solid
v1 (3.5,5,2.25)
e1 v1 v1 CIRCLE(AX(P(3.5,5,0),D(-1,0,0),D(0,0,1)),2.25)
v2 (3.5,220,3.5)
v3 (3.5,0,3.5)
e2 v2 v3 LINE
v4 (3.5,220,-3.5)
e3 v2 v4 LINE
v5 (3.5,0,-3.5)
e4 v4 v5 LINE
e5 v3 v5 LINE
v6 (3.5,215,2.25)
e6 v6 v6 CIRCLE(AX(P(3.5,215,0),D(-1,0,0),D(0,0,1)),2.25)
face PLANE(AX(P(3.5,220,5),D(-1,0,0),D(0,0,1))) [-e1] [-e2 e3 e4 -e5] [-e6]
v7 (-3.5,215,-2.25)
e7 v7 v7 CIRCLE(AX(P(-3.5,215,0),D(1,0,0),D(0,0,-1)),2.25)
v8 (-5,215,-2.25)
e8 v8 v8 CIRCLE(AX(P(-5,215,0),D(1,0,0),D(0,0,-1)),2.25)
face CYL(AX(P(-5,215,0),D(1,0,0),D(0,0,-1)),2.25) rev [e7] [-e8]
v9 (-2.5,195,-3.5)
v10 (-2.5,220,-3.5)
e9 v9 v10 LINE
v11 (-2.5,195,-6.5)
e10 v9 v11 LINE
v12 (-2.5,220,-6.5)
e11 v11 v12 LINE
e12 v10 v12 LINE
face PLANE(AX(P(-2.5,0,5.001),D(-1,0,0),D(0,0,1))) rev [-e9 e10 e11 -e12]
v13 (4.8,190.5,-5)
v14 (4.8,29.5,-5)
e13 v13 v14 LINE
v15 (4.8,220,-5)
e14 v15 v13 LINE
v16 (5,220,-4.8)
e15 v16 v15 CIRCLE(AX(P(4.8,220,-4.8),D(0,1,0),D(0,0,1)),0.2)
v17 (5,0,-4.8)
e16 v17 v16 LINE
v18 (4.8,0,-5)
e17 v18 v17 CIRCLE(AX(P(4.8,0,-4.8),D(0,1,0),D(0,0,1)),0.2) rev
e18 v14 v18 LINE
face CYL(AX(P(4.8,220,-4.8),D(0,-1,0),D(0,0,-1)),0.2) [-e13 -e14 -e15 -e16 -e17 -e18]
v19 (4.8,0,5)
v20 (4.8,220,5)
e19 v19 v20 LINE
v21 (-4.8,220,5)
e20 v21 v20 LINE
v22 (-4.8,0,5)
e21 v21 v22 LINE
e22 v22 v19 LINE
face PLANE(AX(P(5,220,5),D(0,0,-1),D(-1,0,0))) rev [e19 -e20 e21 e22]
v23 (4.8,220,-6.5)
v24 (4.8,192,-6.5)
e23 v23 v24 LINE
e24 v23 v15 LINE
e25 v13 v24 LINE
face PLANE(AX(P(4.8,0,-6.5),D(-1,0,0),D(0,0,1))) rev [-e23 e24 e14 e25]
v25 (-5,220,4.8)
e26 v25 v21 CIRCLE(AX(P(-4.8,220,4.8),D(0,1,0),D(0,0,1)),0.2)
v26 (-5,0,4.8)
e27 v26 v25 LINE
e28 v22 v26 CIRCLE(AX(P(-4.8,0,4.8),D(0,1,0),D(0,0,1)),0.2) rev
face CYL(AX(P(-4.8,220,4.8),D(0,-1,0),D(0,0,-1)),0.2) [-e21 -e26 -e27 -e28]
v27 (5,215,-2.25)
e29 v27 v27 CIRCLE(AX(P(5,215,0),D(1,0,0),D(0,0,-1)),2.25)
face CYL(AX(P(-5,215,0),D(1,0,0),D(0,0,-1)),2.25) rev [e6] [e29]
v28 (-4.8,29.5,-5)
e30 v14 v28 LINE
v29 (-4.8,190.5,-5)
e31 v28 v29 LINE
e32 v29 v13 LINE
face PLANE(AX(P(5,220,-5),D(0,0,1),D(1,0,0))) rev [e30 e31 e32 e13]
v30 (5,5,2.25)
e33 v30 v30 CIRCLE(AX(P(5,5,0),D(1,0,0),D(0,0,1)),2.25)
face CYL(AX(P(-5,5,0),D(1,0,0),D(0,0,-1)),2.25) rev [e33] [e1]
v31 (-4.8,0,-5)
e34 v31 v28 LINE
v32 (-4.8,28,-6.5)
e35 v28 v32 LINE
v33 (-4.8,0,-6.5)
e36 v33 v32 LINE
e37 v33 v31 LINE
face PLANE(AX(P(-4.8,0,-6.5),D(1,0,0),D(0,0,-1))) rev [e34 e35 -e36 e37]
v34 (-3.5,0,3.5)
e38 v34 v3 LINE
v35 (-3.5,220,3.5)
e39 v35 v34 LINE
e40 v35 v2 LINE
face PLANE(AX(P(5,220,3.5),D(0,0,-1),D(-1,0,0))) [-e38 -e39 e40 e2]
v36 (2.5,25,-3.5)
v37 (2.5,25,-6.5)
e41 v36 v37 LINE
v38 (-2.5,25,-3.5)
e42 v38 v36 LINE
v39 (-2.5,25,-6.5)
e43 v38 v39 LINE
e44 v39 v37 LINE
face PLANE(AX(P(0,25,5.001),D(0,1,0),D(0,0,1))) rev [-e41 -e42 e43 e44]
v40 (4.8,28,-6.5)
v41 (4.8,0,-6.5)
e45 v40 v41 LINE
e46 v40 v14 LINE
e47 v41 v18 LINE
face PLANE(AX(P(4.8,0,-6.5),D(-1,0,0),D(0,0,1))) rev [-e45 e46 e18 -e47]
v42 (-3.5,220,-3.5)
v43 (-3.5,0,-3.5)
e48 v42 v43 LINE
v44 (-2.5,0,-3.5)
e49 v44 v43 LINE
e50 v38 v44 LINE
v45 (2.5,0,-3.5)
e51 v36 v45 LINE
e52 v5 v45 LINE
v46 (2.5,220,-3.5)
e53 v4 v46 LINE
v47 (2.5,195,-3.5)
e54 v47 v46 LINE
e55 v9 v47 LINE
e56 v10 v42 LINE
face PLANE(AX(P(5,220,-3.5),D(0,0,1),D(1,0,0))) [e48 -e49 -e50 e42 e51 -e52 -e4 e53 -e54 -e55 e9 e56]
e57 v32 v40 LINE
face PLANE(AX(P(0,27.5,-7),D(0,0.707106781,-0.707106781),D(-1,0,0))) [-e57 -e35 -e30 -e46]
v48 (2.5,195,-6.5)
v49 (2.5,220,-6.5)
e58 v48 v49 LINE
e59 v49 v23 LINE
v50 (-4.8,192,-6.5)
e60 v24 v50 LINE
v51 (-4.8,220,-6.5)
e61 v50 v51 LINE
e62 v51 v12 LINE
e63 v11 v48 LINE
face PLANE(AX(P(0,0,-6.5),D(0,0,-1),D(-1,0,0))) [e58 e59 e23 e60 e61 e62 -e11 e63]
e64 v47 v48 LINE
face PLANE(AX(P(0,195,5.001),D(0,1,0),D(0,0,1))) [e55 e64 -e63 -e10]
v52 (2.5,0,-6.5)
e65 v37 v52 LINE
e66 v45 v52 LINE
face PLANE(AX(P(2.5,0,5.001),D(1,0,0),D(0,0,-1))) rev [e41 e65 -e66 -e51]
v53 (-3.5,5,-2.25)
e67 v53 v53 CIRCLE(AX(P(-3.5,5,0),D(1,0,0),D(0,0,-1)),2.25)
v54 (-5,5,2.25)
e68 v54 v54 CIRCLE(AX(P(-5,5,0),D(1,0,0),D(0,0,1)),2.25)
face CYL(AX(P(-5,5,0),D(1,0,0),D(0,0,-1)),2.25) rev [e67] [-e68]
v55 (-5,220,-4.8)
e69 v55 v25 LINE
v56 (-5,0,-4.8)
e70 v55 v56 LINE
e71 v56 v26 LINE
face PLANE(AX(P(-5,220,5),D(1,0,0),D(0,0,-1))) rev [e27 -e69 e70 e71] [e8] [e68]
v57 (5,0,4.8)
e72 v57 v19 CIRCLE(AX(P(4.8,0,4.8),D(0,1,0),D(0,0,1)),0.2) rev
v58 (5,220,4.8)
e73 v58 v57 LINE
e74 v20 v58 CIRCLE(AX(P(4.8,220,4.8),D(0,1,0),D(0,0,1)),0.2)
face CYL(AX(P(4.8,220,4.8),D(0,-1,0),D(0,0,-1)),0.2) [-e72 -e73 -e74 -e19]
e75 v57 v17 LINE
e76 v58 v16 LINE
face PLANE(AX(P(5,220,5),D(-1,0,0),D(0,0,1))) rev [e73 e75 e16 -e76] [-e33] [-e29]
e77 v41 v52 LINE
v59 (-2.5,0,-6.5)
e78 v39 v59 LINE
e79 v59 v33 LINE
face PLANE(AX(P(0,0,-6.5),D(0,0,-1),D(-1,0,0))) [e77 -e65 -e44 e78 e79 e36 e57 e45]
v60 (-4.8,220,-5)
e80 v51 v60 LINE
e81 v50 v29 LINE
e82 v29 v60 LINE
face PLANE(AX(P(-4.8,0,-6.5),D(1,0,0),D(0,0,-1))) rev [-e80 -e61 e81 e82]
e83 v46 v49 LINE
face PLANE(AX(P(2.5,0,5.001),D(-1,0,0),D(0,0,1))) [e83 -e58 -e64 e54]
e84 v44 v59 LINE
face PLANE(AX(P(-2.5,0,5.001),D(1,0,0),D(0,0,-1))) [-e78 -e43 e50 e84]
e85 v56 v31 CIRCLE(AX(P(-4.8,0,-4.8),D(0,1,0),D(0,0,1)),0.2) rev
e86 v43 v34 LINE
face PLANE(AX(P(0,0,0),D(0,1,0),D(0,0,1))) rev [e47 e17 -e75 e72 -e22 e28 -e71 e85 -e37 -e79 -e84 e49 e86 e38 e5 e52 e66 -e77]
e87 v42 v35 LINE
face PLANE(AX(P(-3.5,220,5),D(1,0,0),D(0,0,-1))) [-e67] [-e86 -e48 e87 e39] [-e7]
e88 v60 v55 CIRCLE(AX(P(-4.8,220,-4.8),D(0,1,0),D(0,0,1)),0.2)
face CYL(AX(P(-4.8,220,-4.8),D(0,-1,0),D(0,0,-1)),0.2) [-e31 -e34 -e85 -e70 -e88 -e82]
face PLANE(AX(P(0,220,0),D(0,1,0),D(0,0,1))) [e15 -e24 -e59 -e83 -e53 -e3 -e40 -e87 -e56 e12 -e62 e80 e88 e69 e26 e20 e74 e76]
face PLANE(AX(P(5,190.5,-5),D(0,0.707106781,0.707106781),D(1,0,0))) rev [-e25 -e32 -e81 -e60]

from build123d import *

# Parameters (mm, degrees)
SKETCH1_W               = 10
SKETCH1_H               = 10
SKETCH1_W_2             = 7
SKETCH1_H_2             = 7
EXTRUDE_THIN1_DEPTH     = 220
CUT_EXTRUDE1_DEPTH      = 221.113607031
CUT_EXTRUDE1_DEPTH_BACK = 221.113607031
SKETCH2_R               = 2.25
FILLET1_R               = 0.2
CUT_EXTRUDE2_REACH      = 222.284
SKETCH5_W               = 5
SKETCH5_H               = 25
BOSS_EXTRUDE3_DEPTH     = 1.5
CHAMFER1_SIZE           = 2


with BuildPart() as part:
    # Sketch1 → Extrude-Thin1 (new body)
    with BuildSketch(Plane(origin=(0, 0, 0), x_dir=(1, 0, 0), z_dir=(0, 1, 0))):
        Rectangle(SKETCH1_W, SKETCH1_H)
        Rectangle(SKETCH1_W_2, SKETCH1_H_2, mode=Mode.SUBTRACT)
    extrude(amount=EXTRUDE_THIN1_DEPTH)

    # Sketch2 → Cut-Extrude1 (cut, two sides: drawn at the far end of the back side and taken through both)
    with BuildSketch(Plane(origin=(0, 0, 0), x_dir=(0, 0, -1), z_dir=(1, 0, 0)).offset(-CUT_EXTRUDE1_DEPTH_BACK)):
        with Locations((0, 215)):
            Circle(SKETCH2_R)
        with Locations(Location((0, 5, 0), (0, 0, 180))):
            Circle(SKETCH2_R)
    extrude(amount=CUT_EXTRUDE1_DEPTH + CUT_EXTRUDE1_DEPTH_BACK, mode=Mode.SUBTRACT)

    # Fillet1
    fillet1_edges = [part.edges().sort_by_distance(p)[0] for p in [
        (-5, 110, -5),
        (5, 110, -5),
        (5, 110, 5),
        (-5, 110, 5),
    ]]
    fillet(fillet1_edges, radius=FILLET1_R)

    # Sketch5 → Cut-Extrude2 (cut, up to next)
    with BuildSketch(Plane(origin=(0, 0, -5), x_dir=(-1, 0, 0), z_dir=(0, 0, -1)), mode=Mode.PRIVATE) as cut_extrude2_sk1:
        with Locations((0, 207.5)):
            Rectangle(SKETCH5_W, SKETCH5_H)
    cut_extrude2_tool1 = extrude(cut_extrude2_sk1.sketch, amount=-CUT_EXTRUDE2_REACH, mode=Mode.PRIVATE) & part.part
    # Sketch5 → Cut-Extrude2 (cut, up to next)
    with BuildSketch(Plane(origin=(0, 0, -5), x_dir=(-1, 0, 0), z_dir=(0, 0, -1)), mode=Mode.PRIVATE) as cut_extrude2_sk2:
        with Locations((0, 12.5)):
            Rectangle(SKETCH5_W, SKETCH5_H)
    cut_extrude2_tool2 = extrude(cut_extrude2_sk2.sketch, amount=-CUT_EXTRUDE2_REACH, mode=Mode.PRIVATE) & part.part
    add(cut_extrude2_tool1.solids().sort_by_distance((0, 207.5, -5))[0], mode=Mode.SUBTRACT)
    add(cut_extrude2_tool2.solids().sort_by_distance((0, 12.5, -5))[0], mode=Mode.SUBTRACT)

    # Sketch5<3> → Boss-Extrude3 (add)
    with BuildSketch(Plane(origin=(0, 0, -5), x_dir=(-1, 0, 0), z_dir=(0, 0, -1))):
        Polygon((4.8, 0), (4.8, 27.5), (-4.8, 27.5), (-4.8, 0), (-2.5, 0), (-2.5, 25), (2.5, 25), (2.5, 0), align=None)
        Polygon((-4.8, 192.5), (4.8, 192.5), (4.8, 220), (2.5, 220), (2.5, 195), (-2.5, 195), (-2.5, 220), (-4.8, 220), align=None)
    extrude(amount=BOSS_EXTRUDE3_DEPTH)

    # Chamfer1
    # the kernel refuses this chamfer: 2 mm, written as the material it adds along each edge
    with BuildSketch(Plane(origin=(-4.8, 27.5, -5), x_dir=(0, 0.9996219169112968, 0.02749587661058694), z_dir=(1, 0, 0))) as chamfer1_piece_1_section:
        Polygon((CHAMFER1_SIZE * 0.999621916911, -CHAMFER1_SIZE * 0.0274958766106), (-CHAMFER1_SIZE * 0.0274958766106, -CHAMFER1_SIZE * 0.999621916911), (0, 0), align=None)
    chamfer1_piece_1 = extrude(amount=9.6, mode=Mode.PRIVATE)
    chamfer1_piece_1 = split(chamfer1_piece_1, bisect_by=Plane(origin=(0, 28.20391822, -6.5), z_dir=(0, 0, 1)), keep=Keep.TOP, mode=Mode.PRIVATE)
    add(chamfer1_piece_1)
    with BuildSketch(Plane(origin=(4.8, 192.5, -5), x_dir=(0, -0.9996219169112968, 0.027495876610586605), z_dir=(-1, 0, 0))) as chamfer1_piece_2_section:
        Polygon((CHAMFER1_SIZE * 0.999621916911, -CHAMFER1_SIZE * 0.0274958766106), (-CHAMFER1_SIZE * 0.0274958766106, -CHAMFER1_SIZE * 0.999621916911), (0, 0), align=None)
    chamfer1_piece_2 = extrude(amount=9.6, mode=Mode.PRIVATE)
    chamfer1_piece_2 = split(chamfer1_piece_2, bisect_by=Plane(origin=(0, 191.79608178, -6.5), z_dir=(0, 0, 1)), keep=Keep.TOP, mode=Mode.PRIVATE)
    add(chamfer1_piece_2)


solid = part.part
